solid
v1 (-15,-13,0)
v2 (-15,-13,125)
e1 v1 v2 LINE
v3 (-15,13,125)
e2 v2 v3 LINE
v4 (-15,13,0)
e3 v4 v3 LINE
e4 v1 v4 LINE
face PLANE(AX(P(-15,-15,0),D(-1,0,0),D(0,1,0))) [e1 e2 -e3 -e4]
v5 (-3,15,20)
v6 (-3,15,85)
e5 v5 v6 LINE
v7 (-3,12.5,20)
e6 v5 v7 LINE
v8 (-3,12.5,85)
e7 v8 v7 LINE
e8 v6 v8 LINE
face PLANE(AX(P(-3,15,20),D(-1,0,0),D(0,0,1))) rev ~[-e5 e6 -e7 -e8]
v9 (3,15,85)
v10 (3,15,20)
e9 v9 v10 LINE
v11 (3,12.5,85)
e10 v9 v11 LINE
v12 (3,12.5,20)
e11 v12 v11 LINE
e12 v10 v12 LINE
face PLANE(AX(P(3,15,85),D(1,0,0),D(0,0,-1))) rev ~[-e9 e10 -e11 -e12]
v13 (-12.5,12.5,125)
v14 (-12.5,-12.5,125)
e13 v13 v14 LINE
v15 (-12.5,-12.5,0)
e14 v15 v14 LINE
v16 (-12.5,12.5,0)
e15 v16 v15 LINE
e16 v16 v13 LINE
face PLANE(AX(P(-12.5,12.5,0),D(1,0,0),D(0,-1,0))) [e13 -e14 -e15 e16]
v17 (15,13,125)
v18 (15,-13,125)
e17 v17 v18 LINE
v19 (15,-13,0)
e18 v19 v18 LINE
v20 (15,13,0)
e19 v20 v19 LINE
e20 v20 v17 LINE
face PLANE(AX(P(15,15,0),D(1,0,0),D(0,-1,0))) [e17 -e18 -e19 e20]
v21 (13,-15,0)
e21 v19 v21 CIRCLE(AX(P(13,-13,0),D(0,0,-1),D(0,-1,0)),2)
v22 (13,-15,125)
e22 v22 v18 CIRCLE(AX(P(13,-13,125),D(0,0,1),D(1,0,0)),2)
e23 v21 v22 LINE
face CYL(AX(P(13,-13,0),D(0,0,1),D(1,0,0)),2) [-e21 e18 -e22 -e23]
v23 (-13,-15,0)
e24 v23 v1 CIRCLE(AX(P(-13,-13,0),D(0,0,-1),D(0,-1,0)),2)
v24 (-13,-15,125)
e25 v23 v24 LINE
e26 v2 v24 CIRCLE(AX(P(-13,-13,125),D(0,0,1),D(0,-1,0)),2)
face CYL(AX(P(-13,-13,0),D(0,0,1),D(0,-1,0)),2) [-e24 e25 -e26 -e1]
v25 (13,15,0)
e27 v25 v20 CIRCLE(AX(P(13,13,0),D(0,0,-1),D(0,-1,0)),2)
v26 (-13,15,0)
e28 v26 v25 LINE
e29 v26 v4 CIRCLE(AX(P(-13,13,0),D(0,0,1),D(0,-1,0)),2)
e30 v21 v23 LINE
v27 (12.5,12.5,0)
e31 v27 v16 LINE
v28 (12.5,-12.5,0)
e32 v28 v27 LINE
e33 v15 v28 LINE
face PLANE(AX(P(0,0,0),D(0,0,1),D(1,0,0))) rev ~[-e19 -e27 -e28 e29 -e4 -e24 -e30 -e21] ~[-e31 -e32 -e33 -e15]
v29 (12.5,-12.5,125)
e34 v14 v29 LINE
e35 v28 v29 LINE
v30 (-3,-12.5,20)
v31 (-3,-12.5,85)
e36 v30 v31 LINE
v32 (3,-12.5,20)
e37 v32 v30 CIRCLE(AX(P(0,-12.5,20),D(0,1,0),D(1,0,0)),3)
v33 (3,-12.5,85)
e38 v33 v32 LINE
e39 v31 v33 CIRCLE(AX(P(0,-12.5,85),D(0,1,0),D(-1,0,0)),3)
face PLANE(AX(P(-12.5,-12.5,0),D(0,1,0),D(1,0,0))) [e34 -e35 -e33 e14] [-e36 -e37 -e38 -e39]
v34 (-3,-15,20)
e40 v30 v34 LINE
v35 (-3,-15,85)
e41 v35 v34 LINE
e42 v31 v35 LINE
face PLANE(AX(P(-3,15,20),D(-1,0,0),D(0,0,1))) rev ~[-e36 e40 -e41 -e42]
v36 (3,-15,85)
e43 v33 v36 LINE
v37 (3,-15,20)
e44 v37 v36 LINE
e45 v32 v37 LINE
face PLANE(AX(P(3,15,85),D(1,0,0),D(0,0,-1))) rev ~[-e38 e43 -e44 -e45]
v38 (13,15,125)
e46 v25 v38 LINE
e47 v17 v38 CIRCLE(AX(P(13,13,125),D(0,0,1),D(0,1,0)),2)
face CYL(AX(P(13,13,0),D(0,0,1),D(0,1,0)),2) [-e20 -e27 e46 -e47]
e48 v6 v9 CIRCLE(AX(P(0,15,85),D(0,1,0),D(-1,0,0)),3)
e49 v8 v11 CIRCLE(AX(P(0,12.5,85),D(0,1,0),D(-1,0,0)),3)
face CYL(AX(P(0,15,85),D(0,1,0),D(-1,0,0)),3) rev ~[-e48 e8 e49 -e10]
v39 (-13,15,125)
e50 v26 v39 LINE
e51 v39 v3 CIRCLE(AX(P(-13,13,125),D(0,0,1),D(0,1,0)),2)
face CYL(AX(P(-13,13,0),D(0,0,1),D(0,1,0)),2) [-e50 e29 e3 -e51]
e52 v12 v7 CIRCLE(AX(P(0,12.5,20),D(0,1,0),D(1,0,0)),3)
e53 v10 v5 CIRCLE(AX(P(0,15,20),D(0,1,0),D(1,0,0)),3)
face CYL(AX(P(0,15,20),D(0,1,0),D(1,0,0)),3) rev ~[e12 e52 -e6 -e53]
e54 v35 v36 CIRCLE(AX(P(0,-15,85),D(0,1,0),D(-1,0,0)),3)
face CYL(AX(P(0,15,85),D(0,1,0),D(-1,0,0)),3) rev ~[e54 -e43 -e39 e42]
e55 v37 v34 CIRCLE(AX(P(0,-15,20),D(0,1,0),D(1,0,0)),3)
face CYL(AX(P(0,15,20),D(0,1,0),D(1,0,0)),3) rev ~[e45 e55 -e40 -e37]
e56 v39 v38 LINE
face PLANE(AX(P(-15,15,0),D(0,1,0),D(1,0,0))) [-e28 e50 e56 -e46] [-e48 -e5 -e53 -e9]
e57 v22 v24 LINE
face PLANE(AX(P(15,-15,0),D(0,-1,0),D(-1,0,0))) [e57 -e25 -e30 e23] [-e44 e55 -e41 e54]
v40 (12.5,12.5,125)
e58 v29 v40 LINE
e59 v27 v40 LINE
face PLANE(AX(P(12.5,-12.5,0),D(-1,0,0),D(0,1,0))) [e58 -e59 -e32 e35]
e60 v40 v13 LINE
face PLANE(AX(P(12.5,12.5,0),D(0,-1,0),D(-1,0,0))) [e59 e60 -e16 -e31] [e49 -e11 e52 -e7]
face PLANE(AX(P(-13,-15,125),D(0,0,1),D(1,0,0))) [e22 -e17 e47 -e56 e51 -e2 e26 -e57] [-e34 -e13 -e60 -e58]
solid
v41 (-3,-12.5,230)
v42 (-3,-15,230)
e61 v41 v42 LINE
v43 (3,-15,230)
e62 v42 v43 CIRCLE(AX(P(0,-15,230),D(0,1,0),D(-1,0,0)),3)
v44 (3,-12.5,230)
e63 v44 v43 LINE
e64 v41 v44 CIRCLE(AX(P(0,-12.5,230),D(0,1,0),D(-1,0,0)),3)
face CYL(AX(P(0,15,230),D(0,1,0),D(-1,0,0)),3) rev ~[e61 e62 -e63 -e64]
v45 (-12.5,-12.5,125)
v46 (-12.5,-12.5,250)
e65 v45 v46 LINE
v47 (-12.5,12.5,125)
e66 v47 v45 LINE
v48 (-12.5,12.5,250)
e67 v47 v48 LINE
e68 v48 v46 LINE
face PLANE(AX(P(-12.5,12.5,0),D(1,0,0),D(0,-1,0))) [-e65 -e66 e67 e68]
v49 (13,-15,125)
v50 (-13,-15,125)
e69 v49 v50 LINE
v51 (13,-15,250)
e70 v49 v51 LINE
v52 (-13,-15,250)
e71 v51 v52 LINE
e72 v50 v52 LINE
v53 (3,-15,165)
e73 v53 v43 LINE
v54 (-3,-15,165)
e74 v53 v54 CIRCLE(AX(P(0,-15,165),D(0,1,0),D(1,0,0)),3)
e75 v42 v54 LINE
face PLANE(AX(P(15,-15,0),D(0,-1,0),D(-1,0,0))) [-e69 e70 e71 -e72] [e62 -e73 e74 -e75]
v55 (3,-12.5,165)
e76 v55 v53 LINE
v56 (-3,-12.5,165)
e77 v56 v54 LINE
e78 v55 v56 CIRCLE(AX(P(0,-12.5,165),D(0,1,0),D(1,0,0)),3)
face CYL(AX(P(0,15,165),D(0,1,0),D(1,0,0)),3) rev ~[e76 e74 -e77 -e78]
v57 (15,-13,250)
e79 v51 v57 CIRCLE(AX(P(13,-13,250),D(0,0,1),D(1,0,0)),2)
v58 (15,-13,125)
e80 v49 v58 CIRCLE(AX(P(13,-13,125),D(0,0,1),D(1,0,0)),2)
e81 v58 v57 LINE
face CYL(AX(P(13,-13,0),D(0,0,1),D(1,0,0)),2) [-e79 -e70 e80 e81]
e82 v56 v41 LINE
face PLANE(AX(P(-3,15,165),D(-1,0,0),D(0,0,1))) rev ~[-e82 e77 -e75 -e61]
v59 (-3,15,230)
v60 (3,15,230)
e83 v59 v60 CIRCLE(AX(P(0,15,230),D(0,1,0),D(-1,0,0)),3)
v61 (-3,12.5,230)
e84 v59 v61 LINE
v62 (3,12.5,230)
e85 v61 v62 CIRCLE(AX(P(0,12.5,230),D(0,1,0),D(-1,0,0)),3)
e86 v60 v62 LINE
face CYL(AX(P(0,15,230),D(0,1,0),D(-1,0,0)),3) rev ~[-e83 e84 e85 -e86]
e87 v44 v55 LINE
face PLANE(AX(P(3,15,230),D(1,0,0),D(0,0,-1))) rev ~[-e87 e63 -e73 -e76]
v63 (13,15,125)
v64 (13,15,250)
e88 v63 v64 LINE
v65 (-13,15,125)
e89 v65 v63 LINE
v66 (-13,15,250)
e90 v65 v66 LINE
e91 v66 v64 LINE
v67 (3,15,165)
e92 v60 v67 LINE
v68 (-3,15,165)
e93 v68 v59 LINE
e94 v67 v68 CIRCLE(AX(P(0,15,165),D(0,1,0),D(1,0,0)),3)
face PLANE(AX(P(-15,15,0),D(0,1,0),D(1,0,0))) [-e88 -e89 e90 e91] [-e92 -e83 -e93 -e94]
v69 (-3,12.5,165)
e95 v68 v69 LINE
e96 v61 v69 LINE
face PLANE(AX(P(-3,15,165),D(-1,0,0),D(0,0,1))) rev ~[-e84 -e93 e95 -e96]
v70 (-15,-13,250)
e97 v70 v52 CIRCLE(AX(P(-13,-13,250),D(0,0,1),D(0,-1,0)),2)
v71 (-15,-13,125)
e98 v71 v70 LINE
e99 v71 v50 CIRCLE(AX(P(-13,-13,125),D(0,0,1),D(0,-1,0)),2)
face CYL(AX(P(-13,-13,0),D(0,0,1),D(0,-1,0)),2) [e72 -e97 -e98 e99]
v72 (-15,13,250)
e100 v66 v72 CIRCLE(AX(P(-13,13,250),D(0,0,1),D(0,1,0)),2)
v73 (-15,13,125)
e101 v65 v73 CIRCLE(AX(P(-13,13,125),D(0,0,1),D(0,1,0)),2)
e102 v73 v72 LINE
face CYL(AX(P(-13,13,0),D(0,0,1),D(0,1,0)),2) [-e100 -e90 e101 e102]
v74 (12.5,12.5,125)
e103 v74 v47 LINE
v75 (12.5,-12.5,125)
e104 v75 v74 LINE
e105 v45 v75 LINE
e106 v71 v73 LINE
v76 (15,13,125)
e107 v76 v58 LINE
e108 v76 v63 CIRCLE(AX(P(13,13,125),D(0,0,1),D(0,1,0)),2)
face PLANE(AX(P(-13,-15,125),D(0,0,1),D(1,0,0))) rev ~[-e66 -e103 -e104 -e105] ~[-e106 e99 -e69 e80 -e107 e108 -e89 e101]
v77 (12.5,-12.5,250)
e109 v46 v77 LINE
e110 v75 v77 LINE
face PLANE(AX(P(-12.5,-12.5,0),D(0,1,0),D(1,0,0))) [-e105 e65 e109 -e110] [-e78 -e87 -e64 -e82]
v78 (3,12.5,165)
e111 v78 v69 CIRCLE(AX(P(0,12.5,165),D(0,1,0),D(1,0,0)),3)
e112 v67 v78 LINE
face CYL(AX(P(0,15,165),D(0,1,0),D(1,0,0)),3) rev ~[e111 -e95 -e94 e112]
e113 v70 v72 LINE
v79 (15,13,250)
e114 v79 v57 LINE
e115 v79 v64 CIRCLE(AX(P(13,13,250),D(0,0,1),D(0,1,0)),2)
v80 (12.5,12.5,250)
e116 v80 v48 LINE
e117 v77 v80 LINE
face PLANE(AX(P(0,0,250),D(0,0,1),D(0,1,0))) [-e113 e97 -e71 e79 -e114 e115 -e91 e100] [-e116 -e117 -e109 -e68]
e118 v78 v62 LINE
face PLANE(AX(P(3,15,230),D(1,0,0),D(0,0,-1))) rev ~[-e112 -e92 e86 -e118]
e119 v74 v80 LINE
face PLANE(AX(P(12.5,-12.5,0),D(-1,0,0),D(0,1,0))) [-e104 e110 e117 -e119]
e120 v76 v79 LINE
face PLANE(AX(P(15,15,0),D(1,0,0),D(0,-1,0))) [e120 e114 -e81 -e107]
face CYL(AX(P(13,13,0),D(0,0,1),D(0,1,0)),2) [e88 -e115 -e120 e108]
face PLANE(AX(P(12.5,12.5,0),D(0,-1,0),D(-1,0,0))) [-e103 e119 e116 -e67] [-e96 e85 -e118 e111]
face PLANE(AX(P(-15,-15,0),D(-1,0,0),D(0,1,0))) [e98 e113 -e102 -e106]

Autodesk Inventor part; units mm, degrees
ref_plane "YZ Plane" through (0, 0, 0) normal (1, 0, 0) x (0, 1, 0)
sketch "Sketch1" plane through (0, 0, 0) normal (0, 0, 1) x (1, 0, 0)
  line L0 (-15, 15) -> (15, 15)
  line L1 (15, 15) -> (15, -15)
  line L2 (15, -15) -> (-15, -15)
  line L3 (-15, -15) -> (-15, 15)
  line L4 (12.5, 12.5) -> (-12.5, 12.5)
  line L5 (-12.5, 12.5) -> (-12.5, -12.5)
  line L6 (-12.5, -12.5) -> (12.5, -12.5)
  line L7 (12.5, -12.5) -> (12.5, 12.5)
  point P0 (0, 0)
  dimension "d0" = 30
  dimension "d1" = 30
  dimension "d2" = 15
  dimension "d3" = 15
  dimension "d4" = 2.5
extrude "Extrusion1" add sketch "Sketch1" along normal blind 1000
fillet "Fillet1" radius 2 4 edges at (15, 15, 500) (-15, 15, 500) (-15, -15, 500) (15, -15, 500)
ref_plane "Work Plane1" through (0, 0, 250) normal (0, 0, -1) x (-1, 0, 0)
split "Split1" plane through (0, 0, 250) removes the side toward (0, 0, 1)
ref_plane "midPlane" through (-13, -15, 125) normal (0, 0, 1) x (1, 0, 0)
sketch "Sketch3" plane through (-13, 15, 0) normal (0, 1, 0) x (1, 0, 0)
  line L0 (13, -230) -> (13, -165) construction
  line L1 (16, -230) -> (16, -165)
  line L2 (10, -165) -> (10, -230)
  arc A0 (10, -230) -> (16, -230) centre (13, -230) ccw
  arc A1 (16, -165) -> (10, -165) centre (13, -165) ccw
  line L3 (13, -85) -> (13, -20) construction
  line L4 (16, -85) -> (16, -20)
  line L5 (10, -20) -> (10, -85)
  arc A2 (10, -85) -> (16, -85) centre (13, -85) ccw
  arc A3 (16, -20) -> (10, -20) centre (13, -20) ccw
  line L6 (28, -250) -> (28, 0) projected
  line L7 (-2, 0) -> (-2, -250) projected
  line L8 (0, -250) -> (26, -250) projected
  point P0 (13, 0)
  point P1 (13, -197.5)
  point P2 (13, -52.5)
  dimension "d28" = 6
  dimension "d29" = 6
  dimension "d30" = 30
  dimension "d31" = 15
  dimension "d32" = 15
  dimension "d33" = 65
  dimension "d34" = 65
  dimension "d35" = 20
  dimension "d36" = 20
extrude "Extrusion2" cut sketch "Sketch3" against normal through all
split body "Split3" result two bodies by plane through (-13, -15, 125) normal (0, 0, 1) first body at (-14.5, 4.3333, 166.6667)
equation "\"d0\" = sm_varx_squareBarDimension"
equation "\"d1\" = d0"
equation "\"d2\" = 0.5 * d1"
equation "\"d3\" = 0.5 * d0"
equation "\"d4\" = sm_varx_squareBarThickness"
equation "\"d31\" = 0.5 * d30"
equation "\"d32\" = d31"
equation "\"d34\" = d33"
equation "\"d36\" = d35"
equation "\"hoop_angle_z\" = 45deg"
equation "\"hoop_bearing_length\" = 5deg"
equation "\"hoop_cable_diam\" = 5"
equation "\"hoop_cable_pulley_diam\" = 22"
equation "\"hoop_thickness_large\" = 4"
equation "\"hoop_thickness_medium\" = 3.2"
equation "\"hoop_thickness_small\" = 2"
equation "\"hoop_width_large\" = 51"
equation "\"hoop_width_medium\" = 33.7"
equation "\"hoop_width_small\" = 25.4"
equation "\"rack_tooth_addendum\" = 5"
equation "\"rack_tooth_dedendum\" = 5"
equation "\"rack_tooth_thickness\" = 5"
equation "\"secure_arm_angle\" = 35deg"
equation "\"secure_arm_radii\" = 9"
equation "\"support_baseClamp_platformLengthBuffer\" = 35"
equation "\"support_baseClamp_platformThickness\" = 15"
equation "\"support_baseClamp_platformWidthBuffer\" = 0"
equation "\"support_baseClamp_sleeveHoleDiameter\" = 12"
equation "\"support_baseClamp_sleeveSweepTerminationAngle\" = 55deg"
equation "\"support_baseClamp_thickness\" = 8"
equation "\"support_frame_endHoleBuffer\" = 45"
equation "\"support_frame_squareBarFillet\" = 2"
equation "\"support_frame_squareBarThickness\" = 5"
equation "\"hoop_tabs_thickness\" = 6"
equation "\"hoop_tabs_hole\" = 12"
equation "\"wheelchair_deployed_width\" = 635"
equation "\"wheelchair_deployed_length\" = 1067"
equation "\"wheelchair_deployed_height\" = 914"
equation "\"sm_varx_squareBarDimension\" = 30"
equation "\"sm_varx_squareBarThickness\" = 2.5"
equation "\"sm_varx_member_tolerance\" = 0"
equation "\"sm_varx_pinPlate_thickness\" = 5"
equation "\"sm_varx_pinPlate_holeDiameter\" = 5"
equation "\"hoop_bushing12_radialInterference\" = 0"
equation "\"hoop_bushing23_radialInterference\" = 0"
equation "\"hoop_bushing23_od\" = -2 * hoop_thickness_medium + hoop_width_medium + hoop_bushing23_radialInterference"
equation "\"hoop_bushing23_thickness\" = -hoop_width_small + hoop_bushing23_od - 2 * hoop_bushing23_radialInterference"
equation "\"hoop_bushing12_od\" = -2 * hoop_thickness_large + hoop_width_large + hoop_bushing12_radialInterference"
equation "\"wheelchatir_pos_deploy_angle_0\" = 65deg"
equation "\"wheelchatir_pos_store_angle_0\" = 90deg"
equation "\"wheelchatir_pos_deploy_angle_1\" = 20deg"
equation "\"wheelchatir_pos_store_angle_1\" = 20deg"
equation "\"hoop_bushing12_thickness\" = -hoop_width_medium + hoop_bushing12_od - 2 * hoop_bushing12_radialInterference"
properties part number "member_vertical" material "Steel, Galvanized"
